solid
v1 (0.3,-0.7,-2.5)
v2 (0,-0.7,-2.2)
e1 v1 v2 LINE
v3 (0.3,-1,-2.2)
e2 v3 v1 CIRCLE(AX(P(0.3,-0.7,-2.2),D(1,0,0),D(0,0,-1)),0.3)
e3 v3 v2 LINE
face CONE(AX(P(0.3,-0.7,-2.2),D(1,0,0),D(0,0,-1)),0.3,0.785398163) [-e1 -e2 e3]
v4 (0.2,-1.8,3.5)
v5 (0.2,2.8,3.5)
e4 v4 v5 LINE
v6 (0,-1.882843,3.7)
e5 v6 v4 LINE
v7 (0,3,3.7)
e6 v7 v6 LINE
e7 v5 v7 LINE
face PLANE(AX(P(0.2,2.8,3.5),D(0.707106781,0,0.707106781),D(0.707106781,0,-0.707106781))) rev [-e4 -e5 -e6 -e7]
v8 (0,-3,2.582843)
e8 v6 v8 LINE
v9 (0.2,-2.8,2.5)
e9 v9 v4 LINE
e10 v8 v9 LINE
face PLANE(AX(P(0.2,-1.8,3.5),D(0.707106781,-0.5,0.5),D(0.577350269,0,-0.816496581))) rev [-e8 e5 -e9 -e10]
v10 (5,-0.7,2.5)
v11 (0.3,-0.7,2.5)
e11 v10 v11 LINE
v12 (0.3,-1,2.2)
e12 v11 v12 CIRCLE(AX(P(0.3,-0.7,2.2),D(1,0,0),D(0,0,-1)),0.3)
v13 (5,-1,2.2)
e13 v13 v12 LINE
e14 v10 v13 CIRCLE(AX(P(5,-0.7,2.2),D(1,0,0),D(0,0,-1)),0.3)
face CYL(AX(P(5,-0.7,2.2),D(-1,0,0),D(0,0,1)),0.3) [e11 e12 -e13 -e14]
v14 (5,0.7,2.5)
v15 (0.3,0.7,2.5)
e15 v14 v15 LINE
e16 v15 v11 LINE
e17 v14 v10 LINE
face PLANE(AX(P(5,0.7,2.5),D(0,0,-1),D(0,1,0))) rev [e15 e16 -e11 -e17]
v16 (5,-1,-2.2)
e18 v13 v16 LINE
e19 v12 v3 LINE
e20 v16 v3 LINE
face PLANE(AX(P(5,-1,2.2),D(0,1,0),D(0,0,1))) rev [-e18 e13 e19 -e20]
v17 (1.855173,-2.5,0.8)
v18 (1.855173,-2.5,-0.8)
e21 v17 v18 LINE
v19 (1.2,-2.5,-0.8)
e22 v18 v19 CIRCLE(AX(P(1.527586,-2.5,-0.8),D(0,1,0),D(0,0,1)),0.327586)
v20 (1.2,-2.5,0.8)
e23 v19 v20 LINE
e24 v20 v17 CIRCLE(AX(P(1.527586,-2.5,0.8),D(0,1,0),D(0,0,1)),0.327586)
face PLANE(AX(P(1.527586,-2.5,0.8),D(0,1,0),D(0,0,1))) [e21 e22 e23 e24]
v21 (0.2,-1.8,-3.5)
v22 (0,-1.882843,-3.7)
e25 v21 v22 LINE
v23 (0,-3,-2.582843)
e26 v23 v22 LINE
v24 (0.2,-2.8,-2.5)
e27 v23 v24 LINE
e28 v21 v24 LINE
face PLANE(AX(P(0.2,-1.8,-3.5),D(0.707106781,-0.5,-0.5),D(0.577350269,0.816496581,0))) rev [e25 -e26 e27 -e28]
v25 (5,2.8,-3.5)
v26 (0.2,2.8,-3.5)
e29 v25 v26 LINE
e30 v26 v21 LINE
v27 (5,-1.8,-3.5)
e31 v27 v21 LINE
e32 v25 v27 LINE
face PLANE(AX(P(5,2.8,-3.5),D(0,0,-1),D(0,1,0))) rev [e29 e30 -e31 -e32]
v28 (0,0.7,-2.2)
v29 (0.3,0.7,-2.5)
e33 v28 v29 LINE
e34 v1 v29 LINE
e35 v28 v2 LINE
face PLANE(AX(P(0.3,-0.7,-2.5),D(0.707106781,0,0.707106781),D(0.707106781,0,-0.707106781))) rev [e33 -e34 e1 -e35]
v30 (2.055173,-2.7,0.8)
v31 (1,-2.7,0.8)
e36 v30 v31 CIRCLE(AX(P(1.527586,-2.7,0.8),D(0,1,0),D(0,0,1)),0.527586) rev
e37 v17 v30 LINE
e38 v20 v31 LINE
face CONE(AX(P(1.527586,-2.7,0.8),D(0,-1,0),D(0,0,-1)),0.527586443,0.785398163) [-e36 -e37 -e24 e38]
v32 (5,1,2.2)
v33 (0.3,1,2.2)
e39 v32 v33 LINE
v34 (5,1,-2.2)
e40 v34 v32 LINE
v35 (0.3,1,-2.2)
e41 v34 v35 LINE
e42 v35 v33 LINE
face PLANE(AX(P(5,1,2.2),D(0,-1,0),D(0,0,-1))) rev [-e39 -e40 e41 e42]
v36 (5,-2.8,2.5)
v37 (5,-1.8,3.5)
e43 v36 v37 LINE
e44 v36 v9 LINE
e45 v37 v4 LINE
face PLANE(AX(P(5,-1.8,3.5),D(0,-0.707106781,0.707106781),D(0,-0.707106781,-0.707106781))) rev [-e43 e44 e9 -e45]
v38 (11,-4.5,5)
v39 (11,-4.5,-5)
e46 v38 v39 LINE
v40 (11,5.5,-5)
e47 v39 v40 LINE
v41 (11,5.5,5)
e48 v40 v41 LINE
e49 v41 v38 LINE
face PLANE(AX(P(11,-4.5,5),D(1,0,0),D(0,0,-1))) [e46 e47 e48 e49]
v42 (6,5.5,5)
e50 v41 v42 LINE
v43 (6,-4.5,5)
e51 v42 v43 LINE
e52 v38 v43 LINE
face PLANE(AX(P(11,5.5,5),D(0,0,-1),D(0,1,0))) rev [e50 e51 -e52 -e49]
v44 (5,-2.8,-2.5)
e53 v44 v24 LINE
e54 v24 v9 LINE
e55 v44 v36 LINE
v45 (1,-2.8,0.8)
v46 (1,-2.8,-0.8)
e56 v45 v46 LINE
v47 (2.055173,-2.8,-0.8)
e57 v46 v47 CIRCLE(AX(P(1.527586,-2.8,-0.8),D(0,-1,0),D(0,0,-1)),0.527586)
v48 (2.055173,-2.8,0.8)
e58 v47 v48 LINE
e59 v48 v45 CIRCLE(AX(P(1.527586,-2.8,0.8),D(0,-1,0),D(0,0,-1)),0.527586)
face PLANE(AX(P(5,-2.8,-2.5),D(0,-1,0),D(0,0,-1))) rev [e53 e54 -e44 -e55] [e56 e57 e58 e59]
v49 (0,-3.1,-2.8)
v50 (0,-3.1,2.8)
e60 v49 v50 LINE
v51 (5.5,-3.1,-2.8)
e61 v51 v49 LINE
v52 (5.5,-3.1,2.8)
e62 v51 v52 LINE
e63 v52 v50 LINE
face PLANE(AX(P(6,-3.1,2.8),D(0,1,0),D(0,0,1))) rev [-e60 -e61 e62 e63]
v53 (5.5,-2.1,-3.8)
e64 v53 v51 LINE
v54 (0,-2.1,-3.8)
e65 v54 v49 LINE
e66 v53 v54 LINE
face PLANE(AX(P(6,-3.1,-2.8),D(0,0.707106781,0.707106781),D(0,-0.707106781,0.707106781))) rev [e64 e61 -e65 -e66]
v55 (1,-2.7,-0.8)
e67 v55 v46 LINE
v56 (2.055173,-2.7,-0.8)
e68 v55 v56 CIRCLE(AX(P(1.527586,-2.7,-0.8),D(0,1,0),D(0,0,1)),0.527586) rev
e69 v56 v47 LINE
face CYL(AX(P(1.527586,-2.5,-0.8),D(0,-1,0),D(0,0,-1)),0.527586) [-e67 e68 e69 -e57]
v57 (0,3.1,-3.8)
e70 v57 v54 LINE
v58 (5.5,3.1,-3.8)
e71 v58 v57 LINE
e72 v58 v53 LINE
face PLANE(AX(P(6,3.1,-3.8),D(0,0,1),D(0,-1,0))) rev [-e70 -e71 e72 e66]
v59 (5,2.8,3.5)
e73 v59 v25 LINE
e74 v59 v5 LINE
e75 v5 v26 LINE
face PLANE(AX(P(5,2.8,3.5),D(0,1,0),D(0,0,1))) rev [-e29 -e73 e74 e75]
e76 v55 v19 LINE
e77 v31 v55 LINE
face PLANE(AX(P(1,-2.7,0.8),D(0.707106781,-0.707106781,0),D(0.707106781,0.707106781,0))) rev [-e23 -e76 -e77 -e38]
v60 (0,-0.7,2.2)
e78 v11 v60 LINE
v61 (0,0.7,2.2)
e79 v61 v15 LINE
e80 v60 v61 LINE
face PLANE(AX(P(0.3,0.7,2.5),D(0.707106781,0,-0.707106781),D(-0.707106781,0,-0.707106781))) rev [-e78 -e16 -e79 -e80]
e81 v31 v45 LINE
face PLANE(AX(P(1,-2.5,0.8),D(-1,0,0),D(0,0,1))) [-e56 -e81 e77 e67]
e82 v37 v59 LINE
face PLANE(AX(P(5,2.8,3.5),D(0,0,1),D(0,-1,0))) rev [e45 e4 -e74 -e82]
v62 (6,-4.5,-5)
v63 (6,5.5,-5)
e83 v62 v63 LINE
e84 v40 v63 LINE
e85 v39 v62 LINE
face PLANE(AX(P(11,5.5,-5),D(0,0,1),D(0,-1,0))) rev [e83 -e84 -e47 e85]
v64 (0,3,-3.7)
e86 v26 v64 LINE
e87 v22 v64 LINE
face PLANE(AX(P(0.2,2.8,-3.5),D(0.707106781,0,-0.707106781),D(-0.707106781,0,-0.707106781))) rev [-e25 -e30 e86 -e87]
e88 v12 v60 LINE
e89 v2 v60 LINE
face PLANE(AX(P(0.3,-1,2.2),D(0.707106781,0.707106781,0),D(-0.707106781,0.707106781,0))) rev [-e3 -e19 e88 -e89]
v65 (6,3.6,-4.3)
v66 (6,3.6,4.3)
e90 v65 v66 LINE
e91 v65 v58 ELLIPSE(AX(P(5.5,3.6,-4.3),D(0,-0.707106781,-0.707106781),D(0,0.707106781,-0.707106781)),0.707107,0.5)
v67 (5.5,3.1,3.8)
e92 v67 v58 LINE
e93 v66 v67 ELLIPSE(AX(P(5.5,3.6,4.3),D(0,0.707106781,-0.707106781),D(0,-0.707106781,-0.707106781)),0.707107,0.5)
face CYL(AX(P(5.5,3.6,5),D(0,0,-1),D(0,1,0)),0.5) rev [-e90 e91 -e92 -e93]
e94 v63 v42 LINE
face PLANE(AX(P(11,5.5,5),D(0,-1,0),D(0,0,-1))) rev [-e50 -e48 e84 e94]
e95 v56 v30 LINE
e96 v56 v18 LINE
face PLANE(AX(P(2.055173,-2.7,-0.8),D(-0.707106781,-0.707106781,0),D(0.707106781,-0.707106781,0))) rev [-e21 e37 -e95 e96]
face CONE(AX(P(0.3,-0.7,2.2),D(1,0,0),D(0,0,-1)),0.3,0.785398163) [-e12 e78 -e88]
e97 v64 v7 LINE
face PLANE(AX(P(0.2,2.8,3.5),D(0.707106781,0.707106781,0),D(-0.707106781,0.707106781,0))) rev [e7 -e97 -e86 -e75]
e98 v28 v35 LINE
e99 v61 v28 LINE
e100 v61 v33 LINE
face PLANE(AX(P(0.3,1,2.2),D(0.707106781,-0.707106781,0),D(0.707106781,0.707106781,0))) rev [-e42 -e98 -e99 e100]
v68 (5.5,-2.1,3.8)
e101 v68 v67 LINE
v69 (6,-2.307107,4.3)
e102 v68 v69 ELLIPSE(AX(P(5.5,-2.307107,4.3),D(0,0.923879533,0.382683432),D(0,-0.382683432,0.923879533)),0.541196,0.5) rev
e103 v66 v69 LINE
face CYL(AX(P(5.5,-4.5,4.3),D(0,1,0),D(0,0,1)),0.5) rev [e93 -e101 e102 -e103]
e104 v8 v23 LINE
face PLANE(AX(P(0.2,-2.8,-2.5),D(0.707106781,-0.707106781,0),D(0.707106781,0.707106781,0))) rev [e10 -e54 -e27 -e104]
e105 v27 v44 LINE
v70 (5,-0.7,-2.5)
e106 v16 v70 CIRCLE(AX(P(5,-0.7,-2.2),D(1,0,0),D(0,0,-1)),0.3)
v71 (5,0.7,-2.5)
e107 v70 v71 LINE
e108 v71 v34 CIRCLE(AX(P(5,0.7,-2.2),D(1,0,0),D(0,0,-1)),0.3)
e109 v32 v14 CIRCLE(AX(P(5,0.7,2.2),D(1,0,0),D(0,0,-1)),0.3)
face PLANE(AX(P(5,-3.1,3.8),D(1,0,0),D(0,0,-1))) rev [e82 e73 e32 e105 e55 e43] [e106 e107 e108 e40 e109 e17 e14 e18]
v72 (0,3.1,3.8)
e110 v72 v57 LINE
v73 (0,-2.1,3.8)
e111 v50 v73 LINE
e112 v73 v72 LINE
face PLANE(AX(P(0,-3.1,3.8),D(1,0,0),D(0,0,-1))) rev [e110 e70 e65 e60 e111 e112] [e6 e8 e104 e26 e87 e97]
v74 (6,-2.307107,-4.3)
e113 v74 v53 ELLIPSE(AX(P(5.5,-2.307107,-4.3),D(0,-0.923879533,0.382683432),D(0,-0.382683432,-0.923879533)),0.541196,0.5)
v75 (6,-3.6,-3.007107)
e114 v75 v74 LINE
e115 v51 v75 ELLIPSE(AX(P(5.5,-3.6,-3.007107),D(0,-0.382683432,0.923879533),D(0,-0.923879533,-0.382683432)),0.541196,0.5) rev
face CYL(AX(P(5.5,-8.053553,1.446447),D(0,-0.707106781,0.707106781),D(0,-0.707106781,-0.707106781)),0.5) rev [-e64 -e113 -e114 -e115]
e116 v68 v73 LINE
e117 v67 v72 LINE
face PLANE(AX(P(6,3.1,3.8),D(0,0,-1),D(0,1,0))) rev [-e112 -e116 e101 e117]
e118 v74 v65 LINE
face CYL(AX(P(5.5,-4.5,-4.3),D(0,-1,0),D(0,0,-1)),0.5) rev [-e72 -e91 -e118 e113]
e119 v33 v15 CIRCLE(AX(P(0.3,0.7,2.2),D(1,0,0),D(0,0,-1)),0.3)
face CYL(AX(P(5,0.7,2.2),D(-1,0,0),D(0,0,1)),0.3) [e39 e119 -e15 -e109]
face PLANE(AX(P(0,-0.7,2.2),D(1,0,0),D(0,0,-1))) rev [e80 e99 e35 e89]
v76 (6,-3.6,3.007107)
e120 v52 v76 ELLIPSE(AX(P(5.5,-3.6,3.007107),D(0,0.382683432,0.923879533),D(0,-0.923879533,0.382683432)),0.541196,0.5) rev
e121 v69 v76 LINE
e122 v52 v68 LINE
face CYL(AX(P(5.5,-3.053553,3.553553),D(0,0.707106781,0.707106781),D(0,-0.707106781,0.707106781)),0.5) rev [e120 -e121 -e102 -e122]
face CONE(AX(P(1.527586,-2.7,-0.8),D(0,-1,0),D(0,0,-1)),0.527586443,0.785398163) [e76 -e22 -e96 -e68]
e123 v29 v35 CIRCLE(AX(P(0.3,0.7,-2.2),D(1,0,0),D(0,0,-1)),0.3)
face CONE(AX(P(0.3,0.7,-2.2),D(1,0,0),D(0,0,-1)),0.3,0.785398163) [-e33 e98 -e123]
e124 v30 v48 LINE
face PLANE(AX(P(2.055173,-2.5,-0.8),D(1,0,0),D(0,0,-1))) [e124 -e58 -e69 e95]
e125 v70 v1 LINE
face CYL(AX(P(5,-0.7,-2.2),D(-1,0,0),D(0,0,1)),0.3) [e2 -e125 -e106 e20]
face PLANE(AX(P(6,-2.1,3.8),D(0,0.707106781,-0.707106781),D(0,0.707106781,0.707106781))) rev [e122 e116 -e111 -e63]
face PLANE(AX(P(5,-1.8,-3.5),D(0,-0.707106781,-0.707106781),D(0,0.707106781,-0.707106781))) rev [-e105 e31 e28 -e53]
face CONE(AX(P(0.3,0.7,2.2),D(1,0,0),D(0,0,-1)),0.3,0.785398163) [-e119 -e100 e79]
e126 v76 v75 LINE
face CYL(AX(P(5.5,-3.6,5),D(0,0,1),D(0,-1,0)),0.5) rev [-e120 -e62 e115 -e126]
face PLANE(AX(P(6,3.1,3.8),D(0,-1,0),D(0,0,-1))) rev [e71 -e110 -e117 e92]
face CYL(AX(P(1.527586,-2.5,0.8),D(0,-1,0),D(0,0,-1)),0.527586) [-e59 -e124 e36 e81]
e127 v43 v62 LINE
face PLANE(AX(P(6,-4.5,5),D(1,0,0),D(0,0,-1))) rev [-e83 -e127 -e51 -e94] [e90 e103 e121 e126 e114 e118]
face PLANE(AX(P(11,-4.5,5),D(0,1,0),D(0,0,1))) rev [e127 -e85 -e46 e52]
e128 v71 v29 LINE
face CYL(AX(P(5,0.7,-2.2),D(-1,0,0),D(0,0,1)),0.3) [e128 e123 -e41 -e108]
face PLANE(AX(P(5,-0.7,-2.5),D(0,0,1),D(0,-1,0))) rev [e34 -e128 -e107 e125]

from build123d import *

# Parameters (mm, degrees)
BOSS_EXTRUDE1_DEPTH = 5
BOSS_EXTRUDE2_DEPTH = 5
CHAMFER1_SIZE       = 0.3
CHAMFER2_SIZE       = 0.2
BOSS_EXTRUDE3_DEPTH = 1
BOSS_EXTRUDE4_DEPTH = 0.6
CHAMFER4_SIZE       = 0.2
SKETCH5_W           = 10
SKETCH5_H           = 10
BOSS_EXTRUDE5_DEPTH = 5
FILLET1_R           = 0.5


with BuildPart() as part:
    # Sketch1 → Boss-Extrude1 (new body)
    with BuildSketch(Plane(origin=(0, 0, 0), x_dir=(0, 0, -1), z_dir=(1, 0, 0))):
        with BuildLine():
            Line((-2.2, 1), (2.2, 1))
            ThreePointArc((2.2, 1), (2.412132034, 0.912132034), (2.5, 0.7))
            Line((2.5, 0.7), (2.5, -0.7))
            ThreePointArc((2.5, -0.7), (2.412132034, -0.912132034), (2.2, -1))
            Line((2.2, -1), (-2.2, -1))
            ThreePointArc((-2.2, -1), (-2.412132034, -0.912132034), (-2.5, -0.7))
            Line((-2.5, -0.7), (-2.5, 0.7))
            ThreePointArc((-2.5, 0.7), (-2.412132034, 0.912132034), (-2.2, 1))
        make_face()
    extrude(amount=BOSS_EXTRUDE1_DEPTH)

    # Chamfer1
    chamfer1_edges = [part.edges().sort_by_distance(p)[0] for p in [
        (0, -1, 0),
        (0, -0.912132034, 2.412132034),
        (0, 0, 2.5),
        (0, 0.912132034, 2.412132034),
        (0, 1, 0),
        (0, 0.912132034, -2.412132034),
        (0, 0, -2.5),
        (0, -0.912132034, -2.412132034),
    ]]
    chamfer(chamfer1_edges, length=CHAMFER1_SIZE - 0.0001)  # a hair under: the kernel refuses the full size



with BuildPart() as body_2:
    # Sketch2 → Boss-Extrude2 (new body)
    with BuildSketch(Plane.ZY):
        Polygon((3.8, -2.1), (2.8, -3.1), (-2.8, -3.1), (-3.8, -2.1), (-3.8, 3.1), (3.8, 3.1), align=None)
        Polygon((3.5, 2.8), (-3.5, 2.8), (-3.5, -1.8), (-2.5, -2.8), (2.5, -2.8), (3.5, -1.8), align=None, mode=Mode.SUBTRACT)
    extrude(amount=-BOSS_EXTRUDE2_DEPTH)

    # Chamfer2
    chamfer2_edges = [body_2.edges().sort_by_distance(p)[0] for p in [
        (0, 0.5, 3.5),
        (0, 2.8, 0),
        (0, 0.5, -3.5),
        (0, -2.3, -3),
        (0, -2.8, 0),
        (0, -2.3, 3),
    ]]
    chamfer(chamfer2_edges, length=CHAMFER2_SIZE)


with BuildPart() as part_1:
    add(part.part)

    add(body_2.part)  # Boss-Extrude3 merges body 2
    # Sketch3 → Boss-Extrude3 (add)
    with BuildSketch(Plane(origin=(5, 0, 0), x_dir=(0, 0, -1), z_dir=(1, 0, 0))):
        Polygon((-3.8, -2.1), (-2.8, -3.1), (2.8, -3.1), (3.8, -2.1), (3.8, 3.1), (-3.8, 3.1), align=None)
    extrude(amount=BOSS_EXTRUDE3_DEPTH)

    # Sketch4 → Boss-Extrude4 (add)
    with BuildSketch(Plane.XZ.offset(3.1)):
        with BuildLine():
            Line((1, 0.8), (1, -0.8))
            ThreePointArc((1, -0.8), (1.527586443, -1.327586443), (2.055172886, -0.8))
            Line((2.055172886, -0.8), (2.055172886, 0.8))
            ThreePointArc((2.055172886, 0.8), (1.527586443, 1.327586443), (1, 0.8))
        make_face()
    extrude(amount=-BOSS_EXTRUDE4_DEPTH)

    # Chamfer4
    chamfer4_edges = [part_1.edges().sort_by_distance(p)[0] for p in [
        (1.527586443, -2.5, 1.327586443),
        (2.055172886, -2.5, 0),
        (1.527586443, -2.5, -1.327586443),
        (1, -2.5, 0),
    ]]
    chamfer(chamfer4_edges, length=CHAMFER4_SIZE)

    # Sketch5 → Boss-Extrude5 (add)
    with BuildSketch(Plane(origin=(6, 0, 0), x_dir=(0, 0, -1), z_dir=(1, 0, 0))):
        with Locations((0, 0.5)):
            Rectangle(SKETCH5_W, SKETCH5_H)
    extrude(amount=BOSS_EXTRUDE5_DEPTH)

    # Fillet1
    fillet1_edges = [part_1.edges().sort_by_distance(p)[0] for p in [
        (6, 0.5, 3.8),
        (6, -2.6, 3.3),
        (6, -3.1, 0),
        (6, -2.6, -3.3),
        (6, 0.5, -3.8),
        (6, 3.1, 0),
    ]]
    fillet(fillet1_edges, radius=FILLET1_R)


solid = part_1.part
